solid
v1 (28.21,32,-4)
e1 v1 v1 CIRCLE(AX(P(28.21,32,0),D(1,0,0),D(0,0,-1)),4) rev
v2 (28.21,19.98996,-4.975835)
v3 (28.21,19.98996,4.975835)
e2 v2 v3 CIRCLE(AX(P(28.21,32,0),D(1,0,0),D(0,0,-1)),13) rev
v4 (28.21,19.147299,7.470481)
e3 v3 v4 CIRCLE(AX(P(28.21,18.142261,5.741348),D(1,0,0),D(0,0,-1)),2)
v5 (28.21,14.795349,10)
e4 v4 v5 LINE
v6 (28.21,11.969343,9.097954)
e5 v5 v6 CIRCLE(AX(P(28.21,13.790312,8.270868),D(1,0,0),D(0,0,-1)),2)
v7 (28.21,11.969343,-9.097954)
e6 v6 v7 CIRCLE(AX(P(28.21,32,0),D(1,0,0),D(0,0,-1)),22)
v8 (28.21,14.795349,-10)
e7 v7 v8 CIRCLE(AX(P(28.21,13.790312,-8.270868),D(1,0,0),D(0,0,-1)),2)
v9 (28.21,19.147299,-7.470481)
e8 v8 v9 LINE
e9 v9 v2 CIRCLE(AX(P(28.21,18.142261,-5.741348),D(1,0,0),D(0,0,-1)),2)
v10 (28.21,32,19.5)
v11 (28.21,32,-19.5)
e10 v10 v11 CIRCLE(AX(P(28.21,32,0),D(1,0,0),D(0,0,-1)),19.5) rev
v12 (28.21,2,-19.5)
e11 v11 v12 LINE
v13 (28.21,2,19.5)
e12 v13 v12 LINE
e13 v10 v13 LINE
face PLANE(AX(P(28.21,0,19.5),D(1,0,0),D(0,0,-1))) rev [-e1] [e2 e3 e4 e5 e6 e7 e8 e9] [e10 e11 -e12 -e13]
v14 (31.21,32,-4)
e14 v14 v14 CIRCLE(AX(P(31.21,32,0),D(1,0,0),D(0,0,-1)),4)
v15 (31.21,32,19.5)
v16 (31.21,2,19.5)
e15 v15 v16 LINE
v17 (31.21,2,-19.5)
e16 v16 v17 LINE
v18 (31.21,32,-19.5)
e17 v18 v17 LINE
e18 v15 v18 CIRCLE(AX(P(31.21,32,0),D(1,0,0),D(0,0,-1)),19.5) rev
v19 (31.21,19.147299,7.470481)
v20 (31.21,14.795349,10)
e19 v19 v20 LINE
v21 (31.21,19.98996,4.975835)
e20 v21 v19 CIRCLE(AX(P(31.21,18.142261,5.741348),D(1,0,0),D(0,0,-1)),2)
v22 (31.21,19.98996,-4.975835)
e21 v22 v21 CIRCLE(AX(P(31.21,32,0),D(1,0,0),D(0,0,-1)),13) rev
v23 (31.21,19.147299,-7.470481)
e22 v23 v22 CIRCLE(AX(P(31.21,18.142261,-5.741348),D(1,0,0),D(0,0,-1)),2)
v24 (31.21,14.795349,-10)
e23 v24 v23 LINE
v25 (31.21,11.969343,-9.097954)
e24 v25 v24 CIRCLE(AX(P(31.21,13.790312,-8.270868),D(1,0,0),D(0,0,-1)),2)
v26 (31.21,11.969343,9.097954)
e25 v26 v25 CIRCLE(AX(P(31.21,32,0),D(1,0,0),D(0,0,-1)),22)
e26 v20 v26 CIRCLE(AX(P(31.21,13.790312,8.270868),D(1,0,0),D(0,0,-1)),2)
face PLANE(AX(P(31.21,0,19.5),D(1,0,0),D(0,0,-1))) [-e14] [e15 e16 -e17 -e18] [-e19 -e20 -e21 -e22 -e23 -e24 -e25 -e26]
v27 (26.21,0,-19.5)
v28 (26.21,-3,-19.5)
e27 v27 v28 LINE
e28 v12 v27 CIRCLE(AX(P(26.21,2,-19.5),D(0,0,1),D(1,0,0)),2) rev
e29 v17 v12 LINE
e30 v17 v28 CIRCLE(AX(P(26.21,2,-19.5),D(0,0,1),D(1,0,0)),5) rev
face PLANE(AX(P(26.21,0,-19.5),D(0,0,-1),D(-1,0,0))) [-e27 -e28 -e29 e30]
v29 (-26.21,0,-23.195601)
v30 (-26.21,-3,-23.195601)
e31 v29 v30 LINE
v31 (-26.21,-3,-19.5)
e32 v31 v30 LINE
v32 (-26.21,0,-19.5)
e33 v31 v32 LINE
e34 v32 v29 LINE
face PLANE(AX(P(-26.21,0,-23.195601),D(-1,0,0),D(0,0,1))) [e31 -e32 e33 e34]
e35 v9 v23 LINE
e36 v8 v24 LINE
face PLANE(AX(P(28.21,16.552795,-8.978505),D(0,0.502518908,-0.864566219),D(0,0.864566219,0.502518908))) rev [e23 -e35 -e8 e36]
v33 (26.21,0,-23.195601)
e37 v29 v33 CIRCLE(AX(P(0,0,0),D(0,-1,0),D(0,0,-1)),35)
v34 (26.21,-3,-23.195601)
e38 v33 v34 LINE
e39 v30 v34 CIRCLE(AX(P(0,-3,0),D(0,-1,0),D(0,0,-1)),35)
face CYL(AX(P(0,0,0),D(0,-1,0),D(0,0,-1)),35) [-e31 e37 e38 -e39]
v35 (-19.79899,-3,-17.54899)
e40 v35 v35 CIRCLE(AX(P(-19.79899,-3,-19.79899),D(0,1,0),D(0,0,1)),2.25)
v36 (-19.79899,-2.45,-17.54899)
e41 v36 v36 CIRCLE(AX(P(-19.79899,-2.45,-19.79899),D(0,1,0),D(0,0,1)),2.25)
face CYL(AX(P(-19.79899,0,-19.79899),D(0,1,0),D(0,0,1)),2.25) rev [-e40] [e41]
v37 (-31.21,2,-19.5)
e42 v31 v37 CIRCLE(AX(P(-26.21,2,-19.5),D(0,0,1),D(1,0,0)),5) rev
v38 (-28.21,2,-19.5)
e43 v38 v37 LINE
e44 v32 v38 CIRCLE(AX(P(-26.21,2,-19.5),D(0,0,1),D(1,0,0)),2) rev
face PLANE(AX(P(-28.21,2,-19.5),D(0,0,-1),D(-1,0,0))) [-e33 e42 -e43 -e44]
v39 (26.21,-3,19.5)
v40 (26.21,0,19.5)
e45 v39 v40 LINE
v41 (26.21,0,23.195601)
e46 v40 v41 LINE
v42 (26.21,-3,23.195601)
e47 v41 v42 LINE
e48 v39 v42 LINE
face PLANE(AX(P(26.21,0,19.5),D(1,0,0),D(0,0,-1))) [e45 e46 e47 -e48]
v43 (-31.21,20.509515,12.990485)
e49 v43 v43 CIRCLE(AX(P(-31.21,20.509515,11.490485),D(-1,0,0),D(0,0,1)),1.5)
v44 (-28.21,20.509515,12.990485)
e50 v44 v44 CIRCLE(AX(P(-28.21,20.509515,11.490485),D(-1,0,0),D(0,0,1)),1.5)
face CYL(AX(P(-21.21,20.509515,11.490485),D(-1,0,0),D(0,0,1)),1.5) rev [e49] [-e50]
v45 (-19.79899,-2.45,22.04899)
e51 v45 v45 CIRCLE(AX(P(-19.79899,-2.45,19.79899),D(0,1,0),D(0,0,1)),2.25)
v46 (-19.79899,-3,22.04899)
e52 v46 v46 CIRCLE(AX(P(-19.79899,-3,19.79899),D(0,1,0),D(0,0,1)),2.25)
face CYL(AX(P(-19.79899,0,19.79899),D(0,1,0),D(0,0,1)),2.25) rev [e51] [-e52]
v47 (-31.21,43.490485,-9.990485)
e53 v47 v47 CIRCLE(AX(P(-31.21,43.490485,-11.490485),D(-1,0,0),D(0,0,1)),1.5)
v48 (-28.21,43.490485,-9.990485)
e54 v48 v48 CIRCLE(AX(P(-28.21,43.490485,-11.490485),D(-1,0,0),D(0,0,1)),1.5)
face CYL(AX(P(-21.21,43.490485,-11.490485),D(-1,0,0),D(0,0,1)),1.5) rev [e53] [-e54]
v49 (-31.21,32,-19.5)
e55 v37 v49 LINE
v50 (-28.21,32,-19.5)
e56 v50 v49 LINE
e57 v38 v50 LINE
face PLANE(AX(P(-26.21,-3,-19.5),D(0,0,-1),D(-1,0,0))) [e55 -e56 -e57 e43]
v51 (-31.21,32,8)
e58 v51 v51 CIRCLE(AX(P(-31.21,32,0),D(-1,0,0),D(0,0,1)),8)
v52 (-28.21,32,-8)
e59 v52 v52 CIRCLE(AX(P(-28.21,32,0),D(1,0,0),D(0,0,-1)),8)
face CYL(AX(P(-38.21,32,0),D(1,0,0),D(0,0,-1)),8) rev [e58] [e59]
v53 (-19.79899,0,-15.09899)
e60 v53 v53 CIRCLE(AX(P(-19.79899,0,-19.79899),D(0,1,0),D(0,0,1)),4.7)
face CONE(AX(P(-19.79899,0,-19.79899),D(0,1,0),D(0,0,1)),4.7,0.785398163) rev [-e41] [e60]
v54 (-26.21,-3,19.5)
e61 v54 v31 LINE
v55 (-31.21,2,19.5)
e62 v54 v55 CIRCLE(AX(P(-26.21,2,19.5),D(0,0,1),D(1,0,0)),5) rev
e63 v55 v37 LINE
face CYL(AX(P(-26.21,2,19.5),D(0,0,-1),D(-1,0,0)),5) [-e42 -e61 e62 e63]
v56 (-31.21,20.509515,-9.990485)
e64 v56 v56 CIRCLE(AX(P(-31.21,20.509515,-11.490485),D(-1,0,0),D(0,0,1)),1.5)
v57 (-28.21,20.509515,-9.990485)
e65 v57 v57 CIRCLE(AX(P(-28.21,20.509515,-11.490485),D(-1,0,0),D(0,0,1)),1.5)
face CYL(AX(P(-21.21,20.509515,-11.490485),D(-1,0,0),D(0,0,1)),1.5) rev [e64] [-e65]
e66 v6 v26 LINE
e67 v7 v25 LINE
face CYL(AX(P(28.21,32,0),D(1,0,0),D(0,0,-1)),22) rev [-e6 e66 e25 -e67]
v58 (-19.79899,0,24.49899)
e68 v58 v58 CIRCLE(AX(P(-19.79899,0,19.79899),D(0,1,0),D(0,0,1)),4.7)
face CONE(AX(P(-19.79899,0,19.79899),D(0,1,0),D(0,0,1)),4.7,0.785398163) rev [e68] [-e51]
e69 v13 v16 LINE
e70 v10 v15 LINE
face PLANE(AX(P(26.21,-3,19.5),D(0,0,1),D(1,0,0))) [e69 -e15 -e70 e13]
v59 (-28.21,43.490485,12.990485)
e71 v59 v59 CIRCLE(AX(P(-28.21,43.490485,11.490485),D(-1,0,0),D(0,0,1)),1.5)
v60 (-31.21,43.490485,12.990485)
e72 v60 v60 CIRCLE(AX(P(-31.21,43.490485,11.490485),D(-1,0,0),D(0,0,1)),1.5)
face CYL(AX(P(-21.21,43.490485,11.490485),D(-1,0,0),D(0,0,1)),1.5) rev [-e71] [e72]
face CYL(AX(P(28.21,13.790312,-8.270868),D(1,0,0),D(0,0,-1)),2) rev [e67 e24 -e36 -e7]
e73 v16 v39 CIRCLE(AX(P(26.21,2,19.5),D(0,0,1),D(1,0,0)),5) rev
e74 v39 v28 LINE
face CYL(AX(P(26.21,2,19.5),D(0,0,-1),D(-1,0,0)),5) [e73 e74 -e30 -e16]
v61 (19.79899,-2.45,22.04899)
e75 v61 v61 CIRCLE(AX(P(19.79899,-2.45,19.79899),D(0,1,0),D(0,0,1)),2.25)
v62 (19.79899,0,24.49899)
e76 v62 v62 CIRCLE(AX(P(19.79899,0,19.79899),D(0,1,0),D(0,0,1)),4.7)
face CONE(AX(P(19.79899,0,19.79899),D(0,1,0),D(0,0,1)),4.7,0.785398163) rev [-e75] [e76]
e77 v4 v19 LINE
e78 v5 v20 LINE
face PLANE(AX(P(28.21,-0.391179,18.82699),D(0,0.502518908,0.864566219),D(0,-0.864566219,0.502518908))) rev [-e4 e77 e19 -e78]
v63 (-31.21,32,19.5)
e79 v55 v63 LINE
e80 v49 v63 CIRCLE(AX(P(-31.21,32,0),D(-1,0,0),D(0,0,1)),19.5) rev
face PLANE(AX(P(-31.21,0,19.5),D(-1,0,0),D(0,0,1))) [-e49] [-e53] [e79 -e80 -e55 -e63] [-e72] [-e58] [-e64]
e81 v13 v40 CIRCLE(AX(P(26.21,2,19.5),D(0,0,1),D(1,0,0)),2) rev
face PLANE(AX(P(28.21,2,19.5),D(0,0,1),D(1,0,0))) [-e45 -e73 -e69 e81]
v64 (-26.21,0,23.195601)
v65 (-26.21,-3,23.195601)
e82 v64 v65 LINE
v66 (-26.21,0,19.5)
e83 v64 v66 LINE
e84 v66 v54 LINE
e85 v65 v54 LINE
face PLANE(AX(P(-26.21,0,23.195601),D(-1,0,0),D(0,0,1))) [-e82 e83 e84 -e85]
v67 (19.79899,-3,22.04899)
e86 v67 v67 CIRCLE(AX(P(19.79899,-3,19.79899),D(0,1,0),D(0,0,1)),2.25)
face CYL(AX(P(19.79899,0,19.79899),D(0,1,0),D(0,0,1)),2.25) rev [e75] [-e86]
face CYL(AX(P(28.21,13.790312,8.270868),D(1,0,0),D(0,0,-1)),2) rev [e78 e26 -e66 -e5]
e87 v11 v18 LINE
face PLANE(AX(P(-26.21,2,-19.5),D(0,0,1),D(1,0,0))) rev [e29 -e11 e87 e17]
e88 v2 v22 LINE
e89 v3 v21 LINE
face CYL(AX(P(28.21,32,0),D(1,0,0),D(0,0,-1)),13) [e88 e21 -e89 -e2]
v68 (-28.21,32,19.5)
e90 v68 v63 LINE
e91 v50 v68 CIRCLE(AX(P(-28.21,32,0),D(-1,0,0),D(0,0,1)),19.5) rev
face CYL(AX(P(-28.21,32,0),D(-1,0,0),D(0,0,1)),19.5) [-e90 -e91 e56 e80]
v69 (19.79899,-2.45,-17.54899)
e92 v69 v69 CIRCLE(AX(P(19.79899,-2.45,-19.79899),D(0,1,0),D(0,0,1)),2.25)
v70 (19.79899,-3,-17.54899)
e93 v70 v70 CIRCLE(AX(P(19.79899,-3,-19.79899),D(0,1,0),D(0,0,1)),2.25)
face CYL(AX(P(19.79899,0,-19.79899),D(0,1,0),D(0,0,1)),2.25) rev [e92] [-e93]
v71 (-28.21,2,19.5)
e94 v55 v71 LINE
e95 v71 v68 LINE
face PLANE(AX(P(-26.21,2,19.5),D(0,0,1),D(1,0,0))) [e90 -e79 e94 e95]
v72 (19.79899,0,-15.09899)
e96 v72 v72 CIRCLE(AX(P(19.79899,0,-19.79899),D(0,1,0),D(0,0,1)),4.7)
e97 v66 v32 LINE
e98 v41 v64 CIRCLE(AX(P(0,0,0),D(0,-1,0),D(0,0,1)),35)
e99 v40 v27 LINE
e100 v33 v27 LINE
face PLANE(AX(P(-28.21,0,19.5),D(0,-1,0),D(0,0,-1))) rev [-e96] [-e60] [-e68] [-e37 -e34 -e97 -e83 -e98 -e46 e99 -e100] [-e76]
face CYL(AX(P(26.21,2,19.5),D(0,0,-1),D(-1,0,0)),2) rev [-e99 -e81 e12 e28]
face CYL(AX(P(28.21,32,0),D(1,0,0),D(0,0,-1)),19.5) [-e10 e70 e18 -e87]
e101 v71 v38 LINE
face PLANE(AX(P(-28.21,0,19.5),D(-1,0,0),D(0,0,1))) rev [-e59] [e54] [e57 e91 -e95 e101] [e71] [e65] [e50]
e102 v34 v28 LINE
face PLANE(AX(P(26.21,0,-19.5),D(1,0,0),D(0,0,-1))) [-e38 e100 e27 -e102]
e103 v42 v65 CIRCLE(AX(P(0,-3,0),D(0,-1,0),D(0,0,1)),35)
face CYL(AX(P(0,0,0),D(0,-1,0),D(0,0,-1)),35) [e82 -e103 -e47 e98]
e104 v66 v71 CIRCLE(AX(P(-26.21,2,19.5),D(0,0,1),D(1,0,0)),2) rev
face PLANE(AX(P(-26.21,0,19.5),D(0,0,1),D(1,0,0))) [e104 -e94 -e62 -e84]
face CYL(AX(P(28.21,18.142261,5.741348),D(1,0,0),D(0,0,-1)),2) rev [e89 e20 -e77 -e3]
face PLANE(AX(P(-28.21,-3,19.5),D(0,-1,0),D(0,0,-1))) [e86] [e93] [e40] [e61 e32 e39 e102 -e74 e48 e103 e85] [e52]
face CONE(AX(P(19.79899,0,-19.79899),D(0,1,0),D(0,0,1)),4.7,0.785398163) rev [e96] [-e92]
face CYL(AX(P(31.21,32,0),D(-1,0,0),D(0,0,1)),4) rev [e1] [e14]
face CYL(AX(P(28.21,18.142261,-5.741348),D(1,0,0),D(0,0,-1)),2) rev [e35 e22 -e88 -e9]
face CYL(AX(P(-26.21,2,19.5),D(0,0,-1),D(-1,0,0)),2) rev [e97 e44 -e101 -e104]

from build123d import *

# Parameters (mm, degrees)
BASE_FLANGE1_DEPTH                           = 19.5
SKETCH13_R                                   = 4
CUT_EXTRUDE6_DEPTH                           = 84.228219974
CUT_EXTRUDE7_DEPTH                           = 84.228219974
CUT_EXTRUDE7_DEPTH_BACK                      = 84.228219974
SKETCH33_R                                   = 8
CUT_EXTRUDE10_DEPTH                          = 10
SKETCH34_R                                   = 1.5
CUT_EXTRUDE11_DEPTH                          = 10
BOSS_EXTRUDE1_DEPTH                          = 3
TAB1_START                                   = -3
TAB1_DEPTH                                   = 3
CSK_FOR_M4_COUNTERSUNK_FLAT_HEAD_SCR_2_COUNT = 2
CSK_FOR_M4_COUNTERSUNK_FLAT_HEAD_SCR_2_PITCH = 39.597979746
CSK_FOR_M4_COUNTERSUNK_FLAT_HEAD_SCR_3_COUNT = 2
CSK_FOR_M4_COUNTERSUNK_FLAT_HEAD_SCR_3_PITCH = 56
CSK_FOR_M4_COUNTERSUNK_FLAT_HEAD_SCR_4_COUNT = 2
CSK_FOR_M4_COUNTERSUNK_FLAT_HEAD_SCR_4_PITCH = 39.597979746


# Read off the part's stored shape, not the designer's step: Tab1
# Sheet-metal steps are written as plain solids
with BuildPart() as part:
    # Sketch1 → Base-Flange1 (new, symmetric)
    with BuildSketch(Plane.XY):
        with BuildLine():
            Line((-28.21, 74.65), (-28.21, 2))
            ThreePointArc((-28.21, 2), (-27.624213562, 0.585786438), (-26.21, 0))
            Line((-26.21, 0), (26.21, 0))
            ThreePointArc((26.21, 0), (27.624213562, 0.585786438), (28.21, 2))
            Line((28.21, 2), (28.21, 74.65))
            Line((28.21, 74.65), (31.21, 74.65))
            Line((31.21, 74.65), (31.21, 2))
            ThreePointArc((31.21, 2), (29.745533906, -1.535533906), (26.21, -3))
            Line((26.21, -3), (-26.21, -3))
            ThreePointArc((-26.21, -3), (-29.745533906, -1.535533906), (-31.21, 2))
            Line((-31.21, 2), (-31.21, 74.65))
            Line((-31.21, 74.65), (-28.21, 74.65))
        make_face()
    extrude(amount=BASE_FLANGE1_DEPTH, both=True)

    # Sketch13 → Cut-Extrude6 (cut, through all)
    with BuildSketch(Plane(origin=(0, 0, 0), x_dir=(0, 0, -1), z_dir=(1, 0, 0))):
        with Locations((0, 32)):
            Circle(SKETCH13_R)
    extrude(amount=CUT_EXTRUDE6_DEPTH, mode=Mode.SUBTRACT)

    # Sketch15 → Cut-Extrude7 (cut, two sides: drawn at the far end of the back side and taken through both)
    with BuildSketch(Plane(origin=(0, 0, 0), x_dir=(0, 0, -1), z_dir=(1, 0, 0)).offset(-CUT_EXTRUDE7_DEPTH_BACK)):
        with BuildLine():
            Line((-19.5, 32), (-26.744382408, 32))
            Line((-26.744382408, 32), (-26.744382408, 87.632847334))
            Line((-26.744382408, 87.632847334), (26.744382408, 87.632847334))
            Line((26.744382408, 87.632847334), (26.744382408, 32))
            Line((26.744382408, 32), (19.5, 32))
            ThreePointArc((19.5, 32), (0, 51.5), (-19.5, 32))
        make_face()
        with BuildLine():
            Line((7.470480628, 19.147299148), (10, 14.795349466))
            ThreePointArc((10, 14.795349466), (10.176160856, 13.182152576), (9.097954318, 11.969342816))
            ThreePointArc((9.097954318, 11.969342816), (0, 10), (-9.097954318, 11.969342816))
            ThreePointArc((-9.097954318, 11.969342816), (-10.176160856, 13.182152576), (-10, 14.795349466))
            Line((-10, 14.795349466), (-7.470480628, 19.147299148))
            ThreePointArc((-7.470480628, 19.147299148), (-6.381394917, 20.037080634), (-4.975835097, 19.989959822))
            ThreePointArc((-4.975835097, 19.989959822), (0, 19), (4.975835097, 19.989959822))
            ThreePointArc((4.975835097, 19.989959822), (6.381394917, 20.037080634), (7.470480628, 19.147299148))
        make_face()
    extrude(amount=CUT_EXTRUDE7_DEPTH + CUT_EXTRUDE7_DEPTH_BACK, mode=Mode.SUBTRACT)

    # Sketch33 → Cut-Extrude10 (cut)
    with BuildSketch(Plane(origin=(-28.21, 0, 0), x_dir=(0, 0, -1), z_dir=(1, 0, 0))):
        with Locations((0, 32)):
            Circle(SKETCH33_R)
    extrude(amount=-CUT_EXTRUDE10_DEPTH, mode=Mode.SUBTRACT)

    # Sketch34 → Cut-Extrude11 (cut)
    with BuildSketch(Plane.ZY.offset(31.21)):
        with Locations((-11.490485194, 43.490485194)):
            Circle(SKETCH34_R)
        with Locations((11.490485194, 43.490485194)):
            Circle(SKETCH34_R)
        with Locations((11.490485194, 20.509514806)):
            Circle(SKETCH34_R)
        with Locations((-11.490485194, 20.509514806)):
            Circle(SKETCH34_R)
    extrude(amount=-CUT_EXTRUDE11_DEPTH, mode=Mode.SUBTRACT)

    # Sketch37 → Boss-Extrude1 (add)
    with BuildSketch(Plane.ZY.offset(31.21)):
        with BuildLine():
            Line((7.470480628, 19.147299148), (10, 14.795349466))
            ThreePointArc((10, 14.795349466), (10.176160856, 13.182152576), (9.097954318, 11.969342816))
            ThreePointArc((9.097954318, 11.969342816), (0, 10), (-9.097954318, 11.969342816))
            ThreePointArc((-9.097954318, 11.969342816), (-10.176160856, 13.182152576), (-10, 14.795349466))
            Line((-10, 14.795349466), (-7.470480628, 19.147299148))
            ThreePointArc((-7.470480628, 19.147299148), (-6.381394917, 20.037080634), (-4.975835097, 19.989959822))
            ThreePointArc((-4.975835097, 19.989959822), (0, 19), (4.975835097, 19.989959822))
            ThreePointArc((4.975835097, 19.989959822), (6.381394917, 20.037080634), (7.470480628, 19.147299148))
        make_face()
    extrude(amount=-BOSS_EXTRUDE1_DEPTH)

    # Tab1 outline → Tab1 (add)
    with BuildSketch(Plane.XZ.offset(3).offset(TAB1_START)):
        with BuildLine():
            Line((26.21, 19.5), (26.21, 23.195600876))
            ThreePointArc((26.21, 23.195600876), (0, 35), (-26.21, 23.195600876))
            Line((-26.21, 23.195600876), (-26.21, 19.5))
            Line((-26.21, 19.5), (26.21, 19.5))
        make_face()
        with BuildLine():
            Line((-26.21, -19.5), (-26.21, -23.195600876))
            ThreePointArc((-26.21, -23.195600876), (0, -35), (26.21, -23.195600876))
            Line((26.21, -23.195600876), (26.21, -19.5))
            Line((26.21, -19.5), (-26.21, -19.5))
        make_face()
    extrude(amount=TAB1_DEPTH)

    # Sketch42 → CSK for M4 Countersunk Flat Head Screw1 (revolve, cut)
    with BuildSketch(Plane(origin=(19.798989873, 0, -19.798989873), x_dir=(0, 0, 1), z_dir=(1, 0, 0))):
        Polygon((0, 0), (0, 3), (2.25, 3), (2.25, 2.45), (4.7, 0), align=None)
    csk_for_m4_countersunk_flat_head_screw1 = revolve(axis=Axis((19.798989873, 6.35, -19.798989873), (0, -1, 0)), mode=Mode.SUBTRACT)

    # CSK for M4 Countersunk Flat Head Scr 2: CSK for M4 Countersunk Flat Head Screw1 ×2
    with Locations(*[(-i * CSK_FOR_M4_COUNTERSUNK_FLAT_HEAD_SCR_2_PITCH, 0, 0) for i in range(1, CSK_FOR_M4_COUNTERSUNK_FLAT_HEAD_SCR_2_COUNT)]):
        add(csk_for_m4_countersunk_flat_head_screw1, mode=Mode.SUBTRACT)

    # CSK for M4 Countersunk Flat Head Scr 3: CSK for M4 Countersunk Flat Head Screw1 ×2
    with Locations(*[Vector(-0.7071067811865476, 0, 0.7071067811865476) * (i * CSK_FOR_M4_COUNTERSUNK_FLAT_HEAD_SCR_3_PITCH) for i in range(1, CSK_FOR_M4_COUNTERSUNK_FLAT_HEAD_SCR_3_COUNT)]):
        add(csk_for_m4_countersunk_flat_head_screw1, mode=Mode.SUBTRACT)

    # CSK for M4 Countersunk Flat Head Scr 4: CSK for M4 Countersunk Flat Head Screw1 ×2
    with Locations(*[(0, 0, i * CSK_FOR_M4_COUNTERSUNK_FLAT_HEAD_SCR_4_PITCH) for i in range(1, CSK_FOR_M4_COUNTERSUNK_FLAT_HEAD_SCR_4_COUNT)]):
        add(csk_for_m4_countersunk_flat_head_screw1, mode=Mode.SUBTRACT)


solid = part.part
